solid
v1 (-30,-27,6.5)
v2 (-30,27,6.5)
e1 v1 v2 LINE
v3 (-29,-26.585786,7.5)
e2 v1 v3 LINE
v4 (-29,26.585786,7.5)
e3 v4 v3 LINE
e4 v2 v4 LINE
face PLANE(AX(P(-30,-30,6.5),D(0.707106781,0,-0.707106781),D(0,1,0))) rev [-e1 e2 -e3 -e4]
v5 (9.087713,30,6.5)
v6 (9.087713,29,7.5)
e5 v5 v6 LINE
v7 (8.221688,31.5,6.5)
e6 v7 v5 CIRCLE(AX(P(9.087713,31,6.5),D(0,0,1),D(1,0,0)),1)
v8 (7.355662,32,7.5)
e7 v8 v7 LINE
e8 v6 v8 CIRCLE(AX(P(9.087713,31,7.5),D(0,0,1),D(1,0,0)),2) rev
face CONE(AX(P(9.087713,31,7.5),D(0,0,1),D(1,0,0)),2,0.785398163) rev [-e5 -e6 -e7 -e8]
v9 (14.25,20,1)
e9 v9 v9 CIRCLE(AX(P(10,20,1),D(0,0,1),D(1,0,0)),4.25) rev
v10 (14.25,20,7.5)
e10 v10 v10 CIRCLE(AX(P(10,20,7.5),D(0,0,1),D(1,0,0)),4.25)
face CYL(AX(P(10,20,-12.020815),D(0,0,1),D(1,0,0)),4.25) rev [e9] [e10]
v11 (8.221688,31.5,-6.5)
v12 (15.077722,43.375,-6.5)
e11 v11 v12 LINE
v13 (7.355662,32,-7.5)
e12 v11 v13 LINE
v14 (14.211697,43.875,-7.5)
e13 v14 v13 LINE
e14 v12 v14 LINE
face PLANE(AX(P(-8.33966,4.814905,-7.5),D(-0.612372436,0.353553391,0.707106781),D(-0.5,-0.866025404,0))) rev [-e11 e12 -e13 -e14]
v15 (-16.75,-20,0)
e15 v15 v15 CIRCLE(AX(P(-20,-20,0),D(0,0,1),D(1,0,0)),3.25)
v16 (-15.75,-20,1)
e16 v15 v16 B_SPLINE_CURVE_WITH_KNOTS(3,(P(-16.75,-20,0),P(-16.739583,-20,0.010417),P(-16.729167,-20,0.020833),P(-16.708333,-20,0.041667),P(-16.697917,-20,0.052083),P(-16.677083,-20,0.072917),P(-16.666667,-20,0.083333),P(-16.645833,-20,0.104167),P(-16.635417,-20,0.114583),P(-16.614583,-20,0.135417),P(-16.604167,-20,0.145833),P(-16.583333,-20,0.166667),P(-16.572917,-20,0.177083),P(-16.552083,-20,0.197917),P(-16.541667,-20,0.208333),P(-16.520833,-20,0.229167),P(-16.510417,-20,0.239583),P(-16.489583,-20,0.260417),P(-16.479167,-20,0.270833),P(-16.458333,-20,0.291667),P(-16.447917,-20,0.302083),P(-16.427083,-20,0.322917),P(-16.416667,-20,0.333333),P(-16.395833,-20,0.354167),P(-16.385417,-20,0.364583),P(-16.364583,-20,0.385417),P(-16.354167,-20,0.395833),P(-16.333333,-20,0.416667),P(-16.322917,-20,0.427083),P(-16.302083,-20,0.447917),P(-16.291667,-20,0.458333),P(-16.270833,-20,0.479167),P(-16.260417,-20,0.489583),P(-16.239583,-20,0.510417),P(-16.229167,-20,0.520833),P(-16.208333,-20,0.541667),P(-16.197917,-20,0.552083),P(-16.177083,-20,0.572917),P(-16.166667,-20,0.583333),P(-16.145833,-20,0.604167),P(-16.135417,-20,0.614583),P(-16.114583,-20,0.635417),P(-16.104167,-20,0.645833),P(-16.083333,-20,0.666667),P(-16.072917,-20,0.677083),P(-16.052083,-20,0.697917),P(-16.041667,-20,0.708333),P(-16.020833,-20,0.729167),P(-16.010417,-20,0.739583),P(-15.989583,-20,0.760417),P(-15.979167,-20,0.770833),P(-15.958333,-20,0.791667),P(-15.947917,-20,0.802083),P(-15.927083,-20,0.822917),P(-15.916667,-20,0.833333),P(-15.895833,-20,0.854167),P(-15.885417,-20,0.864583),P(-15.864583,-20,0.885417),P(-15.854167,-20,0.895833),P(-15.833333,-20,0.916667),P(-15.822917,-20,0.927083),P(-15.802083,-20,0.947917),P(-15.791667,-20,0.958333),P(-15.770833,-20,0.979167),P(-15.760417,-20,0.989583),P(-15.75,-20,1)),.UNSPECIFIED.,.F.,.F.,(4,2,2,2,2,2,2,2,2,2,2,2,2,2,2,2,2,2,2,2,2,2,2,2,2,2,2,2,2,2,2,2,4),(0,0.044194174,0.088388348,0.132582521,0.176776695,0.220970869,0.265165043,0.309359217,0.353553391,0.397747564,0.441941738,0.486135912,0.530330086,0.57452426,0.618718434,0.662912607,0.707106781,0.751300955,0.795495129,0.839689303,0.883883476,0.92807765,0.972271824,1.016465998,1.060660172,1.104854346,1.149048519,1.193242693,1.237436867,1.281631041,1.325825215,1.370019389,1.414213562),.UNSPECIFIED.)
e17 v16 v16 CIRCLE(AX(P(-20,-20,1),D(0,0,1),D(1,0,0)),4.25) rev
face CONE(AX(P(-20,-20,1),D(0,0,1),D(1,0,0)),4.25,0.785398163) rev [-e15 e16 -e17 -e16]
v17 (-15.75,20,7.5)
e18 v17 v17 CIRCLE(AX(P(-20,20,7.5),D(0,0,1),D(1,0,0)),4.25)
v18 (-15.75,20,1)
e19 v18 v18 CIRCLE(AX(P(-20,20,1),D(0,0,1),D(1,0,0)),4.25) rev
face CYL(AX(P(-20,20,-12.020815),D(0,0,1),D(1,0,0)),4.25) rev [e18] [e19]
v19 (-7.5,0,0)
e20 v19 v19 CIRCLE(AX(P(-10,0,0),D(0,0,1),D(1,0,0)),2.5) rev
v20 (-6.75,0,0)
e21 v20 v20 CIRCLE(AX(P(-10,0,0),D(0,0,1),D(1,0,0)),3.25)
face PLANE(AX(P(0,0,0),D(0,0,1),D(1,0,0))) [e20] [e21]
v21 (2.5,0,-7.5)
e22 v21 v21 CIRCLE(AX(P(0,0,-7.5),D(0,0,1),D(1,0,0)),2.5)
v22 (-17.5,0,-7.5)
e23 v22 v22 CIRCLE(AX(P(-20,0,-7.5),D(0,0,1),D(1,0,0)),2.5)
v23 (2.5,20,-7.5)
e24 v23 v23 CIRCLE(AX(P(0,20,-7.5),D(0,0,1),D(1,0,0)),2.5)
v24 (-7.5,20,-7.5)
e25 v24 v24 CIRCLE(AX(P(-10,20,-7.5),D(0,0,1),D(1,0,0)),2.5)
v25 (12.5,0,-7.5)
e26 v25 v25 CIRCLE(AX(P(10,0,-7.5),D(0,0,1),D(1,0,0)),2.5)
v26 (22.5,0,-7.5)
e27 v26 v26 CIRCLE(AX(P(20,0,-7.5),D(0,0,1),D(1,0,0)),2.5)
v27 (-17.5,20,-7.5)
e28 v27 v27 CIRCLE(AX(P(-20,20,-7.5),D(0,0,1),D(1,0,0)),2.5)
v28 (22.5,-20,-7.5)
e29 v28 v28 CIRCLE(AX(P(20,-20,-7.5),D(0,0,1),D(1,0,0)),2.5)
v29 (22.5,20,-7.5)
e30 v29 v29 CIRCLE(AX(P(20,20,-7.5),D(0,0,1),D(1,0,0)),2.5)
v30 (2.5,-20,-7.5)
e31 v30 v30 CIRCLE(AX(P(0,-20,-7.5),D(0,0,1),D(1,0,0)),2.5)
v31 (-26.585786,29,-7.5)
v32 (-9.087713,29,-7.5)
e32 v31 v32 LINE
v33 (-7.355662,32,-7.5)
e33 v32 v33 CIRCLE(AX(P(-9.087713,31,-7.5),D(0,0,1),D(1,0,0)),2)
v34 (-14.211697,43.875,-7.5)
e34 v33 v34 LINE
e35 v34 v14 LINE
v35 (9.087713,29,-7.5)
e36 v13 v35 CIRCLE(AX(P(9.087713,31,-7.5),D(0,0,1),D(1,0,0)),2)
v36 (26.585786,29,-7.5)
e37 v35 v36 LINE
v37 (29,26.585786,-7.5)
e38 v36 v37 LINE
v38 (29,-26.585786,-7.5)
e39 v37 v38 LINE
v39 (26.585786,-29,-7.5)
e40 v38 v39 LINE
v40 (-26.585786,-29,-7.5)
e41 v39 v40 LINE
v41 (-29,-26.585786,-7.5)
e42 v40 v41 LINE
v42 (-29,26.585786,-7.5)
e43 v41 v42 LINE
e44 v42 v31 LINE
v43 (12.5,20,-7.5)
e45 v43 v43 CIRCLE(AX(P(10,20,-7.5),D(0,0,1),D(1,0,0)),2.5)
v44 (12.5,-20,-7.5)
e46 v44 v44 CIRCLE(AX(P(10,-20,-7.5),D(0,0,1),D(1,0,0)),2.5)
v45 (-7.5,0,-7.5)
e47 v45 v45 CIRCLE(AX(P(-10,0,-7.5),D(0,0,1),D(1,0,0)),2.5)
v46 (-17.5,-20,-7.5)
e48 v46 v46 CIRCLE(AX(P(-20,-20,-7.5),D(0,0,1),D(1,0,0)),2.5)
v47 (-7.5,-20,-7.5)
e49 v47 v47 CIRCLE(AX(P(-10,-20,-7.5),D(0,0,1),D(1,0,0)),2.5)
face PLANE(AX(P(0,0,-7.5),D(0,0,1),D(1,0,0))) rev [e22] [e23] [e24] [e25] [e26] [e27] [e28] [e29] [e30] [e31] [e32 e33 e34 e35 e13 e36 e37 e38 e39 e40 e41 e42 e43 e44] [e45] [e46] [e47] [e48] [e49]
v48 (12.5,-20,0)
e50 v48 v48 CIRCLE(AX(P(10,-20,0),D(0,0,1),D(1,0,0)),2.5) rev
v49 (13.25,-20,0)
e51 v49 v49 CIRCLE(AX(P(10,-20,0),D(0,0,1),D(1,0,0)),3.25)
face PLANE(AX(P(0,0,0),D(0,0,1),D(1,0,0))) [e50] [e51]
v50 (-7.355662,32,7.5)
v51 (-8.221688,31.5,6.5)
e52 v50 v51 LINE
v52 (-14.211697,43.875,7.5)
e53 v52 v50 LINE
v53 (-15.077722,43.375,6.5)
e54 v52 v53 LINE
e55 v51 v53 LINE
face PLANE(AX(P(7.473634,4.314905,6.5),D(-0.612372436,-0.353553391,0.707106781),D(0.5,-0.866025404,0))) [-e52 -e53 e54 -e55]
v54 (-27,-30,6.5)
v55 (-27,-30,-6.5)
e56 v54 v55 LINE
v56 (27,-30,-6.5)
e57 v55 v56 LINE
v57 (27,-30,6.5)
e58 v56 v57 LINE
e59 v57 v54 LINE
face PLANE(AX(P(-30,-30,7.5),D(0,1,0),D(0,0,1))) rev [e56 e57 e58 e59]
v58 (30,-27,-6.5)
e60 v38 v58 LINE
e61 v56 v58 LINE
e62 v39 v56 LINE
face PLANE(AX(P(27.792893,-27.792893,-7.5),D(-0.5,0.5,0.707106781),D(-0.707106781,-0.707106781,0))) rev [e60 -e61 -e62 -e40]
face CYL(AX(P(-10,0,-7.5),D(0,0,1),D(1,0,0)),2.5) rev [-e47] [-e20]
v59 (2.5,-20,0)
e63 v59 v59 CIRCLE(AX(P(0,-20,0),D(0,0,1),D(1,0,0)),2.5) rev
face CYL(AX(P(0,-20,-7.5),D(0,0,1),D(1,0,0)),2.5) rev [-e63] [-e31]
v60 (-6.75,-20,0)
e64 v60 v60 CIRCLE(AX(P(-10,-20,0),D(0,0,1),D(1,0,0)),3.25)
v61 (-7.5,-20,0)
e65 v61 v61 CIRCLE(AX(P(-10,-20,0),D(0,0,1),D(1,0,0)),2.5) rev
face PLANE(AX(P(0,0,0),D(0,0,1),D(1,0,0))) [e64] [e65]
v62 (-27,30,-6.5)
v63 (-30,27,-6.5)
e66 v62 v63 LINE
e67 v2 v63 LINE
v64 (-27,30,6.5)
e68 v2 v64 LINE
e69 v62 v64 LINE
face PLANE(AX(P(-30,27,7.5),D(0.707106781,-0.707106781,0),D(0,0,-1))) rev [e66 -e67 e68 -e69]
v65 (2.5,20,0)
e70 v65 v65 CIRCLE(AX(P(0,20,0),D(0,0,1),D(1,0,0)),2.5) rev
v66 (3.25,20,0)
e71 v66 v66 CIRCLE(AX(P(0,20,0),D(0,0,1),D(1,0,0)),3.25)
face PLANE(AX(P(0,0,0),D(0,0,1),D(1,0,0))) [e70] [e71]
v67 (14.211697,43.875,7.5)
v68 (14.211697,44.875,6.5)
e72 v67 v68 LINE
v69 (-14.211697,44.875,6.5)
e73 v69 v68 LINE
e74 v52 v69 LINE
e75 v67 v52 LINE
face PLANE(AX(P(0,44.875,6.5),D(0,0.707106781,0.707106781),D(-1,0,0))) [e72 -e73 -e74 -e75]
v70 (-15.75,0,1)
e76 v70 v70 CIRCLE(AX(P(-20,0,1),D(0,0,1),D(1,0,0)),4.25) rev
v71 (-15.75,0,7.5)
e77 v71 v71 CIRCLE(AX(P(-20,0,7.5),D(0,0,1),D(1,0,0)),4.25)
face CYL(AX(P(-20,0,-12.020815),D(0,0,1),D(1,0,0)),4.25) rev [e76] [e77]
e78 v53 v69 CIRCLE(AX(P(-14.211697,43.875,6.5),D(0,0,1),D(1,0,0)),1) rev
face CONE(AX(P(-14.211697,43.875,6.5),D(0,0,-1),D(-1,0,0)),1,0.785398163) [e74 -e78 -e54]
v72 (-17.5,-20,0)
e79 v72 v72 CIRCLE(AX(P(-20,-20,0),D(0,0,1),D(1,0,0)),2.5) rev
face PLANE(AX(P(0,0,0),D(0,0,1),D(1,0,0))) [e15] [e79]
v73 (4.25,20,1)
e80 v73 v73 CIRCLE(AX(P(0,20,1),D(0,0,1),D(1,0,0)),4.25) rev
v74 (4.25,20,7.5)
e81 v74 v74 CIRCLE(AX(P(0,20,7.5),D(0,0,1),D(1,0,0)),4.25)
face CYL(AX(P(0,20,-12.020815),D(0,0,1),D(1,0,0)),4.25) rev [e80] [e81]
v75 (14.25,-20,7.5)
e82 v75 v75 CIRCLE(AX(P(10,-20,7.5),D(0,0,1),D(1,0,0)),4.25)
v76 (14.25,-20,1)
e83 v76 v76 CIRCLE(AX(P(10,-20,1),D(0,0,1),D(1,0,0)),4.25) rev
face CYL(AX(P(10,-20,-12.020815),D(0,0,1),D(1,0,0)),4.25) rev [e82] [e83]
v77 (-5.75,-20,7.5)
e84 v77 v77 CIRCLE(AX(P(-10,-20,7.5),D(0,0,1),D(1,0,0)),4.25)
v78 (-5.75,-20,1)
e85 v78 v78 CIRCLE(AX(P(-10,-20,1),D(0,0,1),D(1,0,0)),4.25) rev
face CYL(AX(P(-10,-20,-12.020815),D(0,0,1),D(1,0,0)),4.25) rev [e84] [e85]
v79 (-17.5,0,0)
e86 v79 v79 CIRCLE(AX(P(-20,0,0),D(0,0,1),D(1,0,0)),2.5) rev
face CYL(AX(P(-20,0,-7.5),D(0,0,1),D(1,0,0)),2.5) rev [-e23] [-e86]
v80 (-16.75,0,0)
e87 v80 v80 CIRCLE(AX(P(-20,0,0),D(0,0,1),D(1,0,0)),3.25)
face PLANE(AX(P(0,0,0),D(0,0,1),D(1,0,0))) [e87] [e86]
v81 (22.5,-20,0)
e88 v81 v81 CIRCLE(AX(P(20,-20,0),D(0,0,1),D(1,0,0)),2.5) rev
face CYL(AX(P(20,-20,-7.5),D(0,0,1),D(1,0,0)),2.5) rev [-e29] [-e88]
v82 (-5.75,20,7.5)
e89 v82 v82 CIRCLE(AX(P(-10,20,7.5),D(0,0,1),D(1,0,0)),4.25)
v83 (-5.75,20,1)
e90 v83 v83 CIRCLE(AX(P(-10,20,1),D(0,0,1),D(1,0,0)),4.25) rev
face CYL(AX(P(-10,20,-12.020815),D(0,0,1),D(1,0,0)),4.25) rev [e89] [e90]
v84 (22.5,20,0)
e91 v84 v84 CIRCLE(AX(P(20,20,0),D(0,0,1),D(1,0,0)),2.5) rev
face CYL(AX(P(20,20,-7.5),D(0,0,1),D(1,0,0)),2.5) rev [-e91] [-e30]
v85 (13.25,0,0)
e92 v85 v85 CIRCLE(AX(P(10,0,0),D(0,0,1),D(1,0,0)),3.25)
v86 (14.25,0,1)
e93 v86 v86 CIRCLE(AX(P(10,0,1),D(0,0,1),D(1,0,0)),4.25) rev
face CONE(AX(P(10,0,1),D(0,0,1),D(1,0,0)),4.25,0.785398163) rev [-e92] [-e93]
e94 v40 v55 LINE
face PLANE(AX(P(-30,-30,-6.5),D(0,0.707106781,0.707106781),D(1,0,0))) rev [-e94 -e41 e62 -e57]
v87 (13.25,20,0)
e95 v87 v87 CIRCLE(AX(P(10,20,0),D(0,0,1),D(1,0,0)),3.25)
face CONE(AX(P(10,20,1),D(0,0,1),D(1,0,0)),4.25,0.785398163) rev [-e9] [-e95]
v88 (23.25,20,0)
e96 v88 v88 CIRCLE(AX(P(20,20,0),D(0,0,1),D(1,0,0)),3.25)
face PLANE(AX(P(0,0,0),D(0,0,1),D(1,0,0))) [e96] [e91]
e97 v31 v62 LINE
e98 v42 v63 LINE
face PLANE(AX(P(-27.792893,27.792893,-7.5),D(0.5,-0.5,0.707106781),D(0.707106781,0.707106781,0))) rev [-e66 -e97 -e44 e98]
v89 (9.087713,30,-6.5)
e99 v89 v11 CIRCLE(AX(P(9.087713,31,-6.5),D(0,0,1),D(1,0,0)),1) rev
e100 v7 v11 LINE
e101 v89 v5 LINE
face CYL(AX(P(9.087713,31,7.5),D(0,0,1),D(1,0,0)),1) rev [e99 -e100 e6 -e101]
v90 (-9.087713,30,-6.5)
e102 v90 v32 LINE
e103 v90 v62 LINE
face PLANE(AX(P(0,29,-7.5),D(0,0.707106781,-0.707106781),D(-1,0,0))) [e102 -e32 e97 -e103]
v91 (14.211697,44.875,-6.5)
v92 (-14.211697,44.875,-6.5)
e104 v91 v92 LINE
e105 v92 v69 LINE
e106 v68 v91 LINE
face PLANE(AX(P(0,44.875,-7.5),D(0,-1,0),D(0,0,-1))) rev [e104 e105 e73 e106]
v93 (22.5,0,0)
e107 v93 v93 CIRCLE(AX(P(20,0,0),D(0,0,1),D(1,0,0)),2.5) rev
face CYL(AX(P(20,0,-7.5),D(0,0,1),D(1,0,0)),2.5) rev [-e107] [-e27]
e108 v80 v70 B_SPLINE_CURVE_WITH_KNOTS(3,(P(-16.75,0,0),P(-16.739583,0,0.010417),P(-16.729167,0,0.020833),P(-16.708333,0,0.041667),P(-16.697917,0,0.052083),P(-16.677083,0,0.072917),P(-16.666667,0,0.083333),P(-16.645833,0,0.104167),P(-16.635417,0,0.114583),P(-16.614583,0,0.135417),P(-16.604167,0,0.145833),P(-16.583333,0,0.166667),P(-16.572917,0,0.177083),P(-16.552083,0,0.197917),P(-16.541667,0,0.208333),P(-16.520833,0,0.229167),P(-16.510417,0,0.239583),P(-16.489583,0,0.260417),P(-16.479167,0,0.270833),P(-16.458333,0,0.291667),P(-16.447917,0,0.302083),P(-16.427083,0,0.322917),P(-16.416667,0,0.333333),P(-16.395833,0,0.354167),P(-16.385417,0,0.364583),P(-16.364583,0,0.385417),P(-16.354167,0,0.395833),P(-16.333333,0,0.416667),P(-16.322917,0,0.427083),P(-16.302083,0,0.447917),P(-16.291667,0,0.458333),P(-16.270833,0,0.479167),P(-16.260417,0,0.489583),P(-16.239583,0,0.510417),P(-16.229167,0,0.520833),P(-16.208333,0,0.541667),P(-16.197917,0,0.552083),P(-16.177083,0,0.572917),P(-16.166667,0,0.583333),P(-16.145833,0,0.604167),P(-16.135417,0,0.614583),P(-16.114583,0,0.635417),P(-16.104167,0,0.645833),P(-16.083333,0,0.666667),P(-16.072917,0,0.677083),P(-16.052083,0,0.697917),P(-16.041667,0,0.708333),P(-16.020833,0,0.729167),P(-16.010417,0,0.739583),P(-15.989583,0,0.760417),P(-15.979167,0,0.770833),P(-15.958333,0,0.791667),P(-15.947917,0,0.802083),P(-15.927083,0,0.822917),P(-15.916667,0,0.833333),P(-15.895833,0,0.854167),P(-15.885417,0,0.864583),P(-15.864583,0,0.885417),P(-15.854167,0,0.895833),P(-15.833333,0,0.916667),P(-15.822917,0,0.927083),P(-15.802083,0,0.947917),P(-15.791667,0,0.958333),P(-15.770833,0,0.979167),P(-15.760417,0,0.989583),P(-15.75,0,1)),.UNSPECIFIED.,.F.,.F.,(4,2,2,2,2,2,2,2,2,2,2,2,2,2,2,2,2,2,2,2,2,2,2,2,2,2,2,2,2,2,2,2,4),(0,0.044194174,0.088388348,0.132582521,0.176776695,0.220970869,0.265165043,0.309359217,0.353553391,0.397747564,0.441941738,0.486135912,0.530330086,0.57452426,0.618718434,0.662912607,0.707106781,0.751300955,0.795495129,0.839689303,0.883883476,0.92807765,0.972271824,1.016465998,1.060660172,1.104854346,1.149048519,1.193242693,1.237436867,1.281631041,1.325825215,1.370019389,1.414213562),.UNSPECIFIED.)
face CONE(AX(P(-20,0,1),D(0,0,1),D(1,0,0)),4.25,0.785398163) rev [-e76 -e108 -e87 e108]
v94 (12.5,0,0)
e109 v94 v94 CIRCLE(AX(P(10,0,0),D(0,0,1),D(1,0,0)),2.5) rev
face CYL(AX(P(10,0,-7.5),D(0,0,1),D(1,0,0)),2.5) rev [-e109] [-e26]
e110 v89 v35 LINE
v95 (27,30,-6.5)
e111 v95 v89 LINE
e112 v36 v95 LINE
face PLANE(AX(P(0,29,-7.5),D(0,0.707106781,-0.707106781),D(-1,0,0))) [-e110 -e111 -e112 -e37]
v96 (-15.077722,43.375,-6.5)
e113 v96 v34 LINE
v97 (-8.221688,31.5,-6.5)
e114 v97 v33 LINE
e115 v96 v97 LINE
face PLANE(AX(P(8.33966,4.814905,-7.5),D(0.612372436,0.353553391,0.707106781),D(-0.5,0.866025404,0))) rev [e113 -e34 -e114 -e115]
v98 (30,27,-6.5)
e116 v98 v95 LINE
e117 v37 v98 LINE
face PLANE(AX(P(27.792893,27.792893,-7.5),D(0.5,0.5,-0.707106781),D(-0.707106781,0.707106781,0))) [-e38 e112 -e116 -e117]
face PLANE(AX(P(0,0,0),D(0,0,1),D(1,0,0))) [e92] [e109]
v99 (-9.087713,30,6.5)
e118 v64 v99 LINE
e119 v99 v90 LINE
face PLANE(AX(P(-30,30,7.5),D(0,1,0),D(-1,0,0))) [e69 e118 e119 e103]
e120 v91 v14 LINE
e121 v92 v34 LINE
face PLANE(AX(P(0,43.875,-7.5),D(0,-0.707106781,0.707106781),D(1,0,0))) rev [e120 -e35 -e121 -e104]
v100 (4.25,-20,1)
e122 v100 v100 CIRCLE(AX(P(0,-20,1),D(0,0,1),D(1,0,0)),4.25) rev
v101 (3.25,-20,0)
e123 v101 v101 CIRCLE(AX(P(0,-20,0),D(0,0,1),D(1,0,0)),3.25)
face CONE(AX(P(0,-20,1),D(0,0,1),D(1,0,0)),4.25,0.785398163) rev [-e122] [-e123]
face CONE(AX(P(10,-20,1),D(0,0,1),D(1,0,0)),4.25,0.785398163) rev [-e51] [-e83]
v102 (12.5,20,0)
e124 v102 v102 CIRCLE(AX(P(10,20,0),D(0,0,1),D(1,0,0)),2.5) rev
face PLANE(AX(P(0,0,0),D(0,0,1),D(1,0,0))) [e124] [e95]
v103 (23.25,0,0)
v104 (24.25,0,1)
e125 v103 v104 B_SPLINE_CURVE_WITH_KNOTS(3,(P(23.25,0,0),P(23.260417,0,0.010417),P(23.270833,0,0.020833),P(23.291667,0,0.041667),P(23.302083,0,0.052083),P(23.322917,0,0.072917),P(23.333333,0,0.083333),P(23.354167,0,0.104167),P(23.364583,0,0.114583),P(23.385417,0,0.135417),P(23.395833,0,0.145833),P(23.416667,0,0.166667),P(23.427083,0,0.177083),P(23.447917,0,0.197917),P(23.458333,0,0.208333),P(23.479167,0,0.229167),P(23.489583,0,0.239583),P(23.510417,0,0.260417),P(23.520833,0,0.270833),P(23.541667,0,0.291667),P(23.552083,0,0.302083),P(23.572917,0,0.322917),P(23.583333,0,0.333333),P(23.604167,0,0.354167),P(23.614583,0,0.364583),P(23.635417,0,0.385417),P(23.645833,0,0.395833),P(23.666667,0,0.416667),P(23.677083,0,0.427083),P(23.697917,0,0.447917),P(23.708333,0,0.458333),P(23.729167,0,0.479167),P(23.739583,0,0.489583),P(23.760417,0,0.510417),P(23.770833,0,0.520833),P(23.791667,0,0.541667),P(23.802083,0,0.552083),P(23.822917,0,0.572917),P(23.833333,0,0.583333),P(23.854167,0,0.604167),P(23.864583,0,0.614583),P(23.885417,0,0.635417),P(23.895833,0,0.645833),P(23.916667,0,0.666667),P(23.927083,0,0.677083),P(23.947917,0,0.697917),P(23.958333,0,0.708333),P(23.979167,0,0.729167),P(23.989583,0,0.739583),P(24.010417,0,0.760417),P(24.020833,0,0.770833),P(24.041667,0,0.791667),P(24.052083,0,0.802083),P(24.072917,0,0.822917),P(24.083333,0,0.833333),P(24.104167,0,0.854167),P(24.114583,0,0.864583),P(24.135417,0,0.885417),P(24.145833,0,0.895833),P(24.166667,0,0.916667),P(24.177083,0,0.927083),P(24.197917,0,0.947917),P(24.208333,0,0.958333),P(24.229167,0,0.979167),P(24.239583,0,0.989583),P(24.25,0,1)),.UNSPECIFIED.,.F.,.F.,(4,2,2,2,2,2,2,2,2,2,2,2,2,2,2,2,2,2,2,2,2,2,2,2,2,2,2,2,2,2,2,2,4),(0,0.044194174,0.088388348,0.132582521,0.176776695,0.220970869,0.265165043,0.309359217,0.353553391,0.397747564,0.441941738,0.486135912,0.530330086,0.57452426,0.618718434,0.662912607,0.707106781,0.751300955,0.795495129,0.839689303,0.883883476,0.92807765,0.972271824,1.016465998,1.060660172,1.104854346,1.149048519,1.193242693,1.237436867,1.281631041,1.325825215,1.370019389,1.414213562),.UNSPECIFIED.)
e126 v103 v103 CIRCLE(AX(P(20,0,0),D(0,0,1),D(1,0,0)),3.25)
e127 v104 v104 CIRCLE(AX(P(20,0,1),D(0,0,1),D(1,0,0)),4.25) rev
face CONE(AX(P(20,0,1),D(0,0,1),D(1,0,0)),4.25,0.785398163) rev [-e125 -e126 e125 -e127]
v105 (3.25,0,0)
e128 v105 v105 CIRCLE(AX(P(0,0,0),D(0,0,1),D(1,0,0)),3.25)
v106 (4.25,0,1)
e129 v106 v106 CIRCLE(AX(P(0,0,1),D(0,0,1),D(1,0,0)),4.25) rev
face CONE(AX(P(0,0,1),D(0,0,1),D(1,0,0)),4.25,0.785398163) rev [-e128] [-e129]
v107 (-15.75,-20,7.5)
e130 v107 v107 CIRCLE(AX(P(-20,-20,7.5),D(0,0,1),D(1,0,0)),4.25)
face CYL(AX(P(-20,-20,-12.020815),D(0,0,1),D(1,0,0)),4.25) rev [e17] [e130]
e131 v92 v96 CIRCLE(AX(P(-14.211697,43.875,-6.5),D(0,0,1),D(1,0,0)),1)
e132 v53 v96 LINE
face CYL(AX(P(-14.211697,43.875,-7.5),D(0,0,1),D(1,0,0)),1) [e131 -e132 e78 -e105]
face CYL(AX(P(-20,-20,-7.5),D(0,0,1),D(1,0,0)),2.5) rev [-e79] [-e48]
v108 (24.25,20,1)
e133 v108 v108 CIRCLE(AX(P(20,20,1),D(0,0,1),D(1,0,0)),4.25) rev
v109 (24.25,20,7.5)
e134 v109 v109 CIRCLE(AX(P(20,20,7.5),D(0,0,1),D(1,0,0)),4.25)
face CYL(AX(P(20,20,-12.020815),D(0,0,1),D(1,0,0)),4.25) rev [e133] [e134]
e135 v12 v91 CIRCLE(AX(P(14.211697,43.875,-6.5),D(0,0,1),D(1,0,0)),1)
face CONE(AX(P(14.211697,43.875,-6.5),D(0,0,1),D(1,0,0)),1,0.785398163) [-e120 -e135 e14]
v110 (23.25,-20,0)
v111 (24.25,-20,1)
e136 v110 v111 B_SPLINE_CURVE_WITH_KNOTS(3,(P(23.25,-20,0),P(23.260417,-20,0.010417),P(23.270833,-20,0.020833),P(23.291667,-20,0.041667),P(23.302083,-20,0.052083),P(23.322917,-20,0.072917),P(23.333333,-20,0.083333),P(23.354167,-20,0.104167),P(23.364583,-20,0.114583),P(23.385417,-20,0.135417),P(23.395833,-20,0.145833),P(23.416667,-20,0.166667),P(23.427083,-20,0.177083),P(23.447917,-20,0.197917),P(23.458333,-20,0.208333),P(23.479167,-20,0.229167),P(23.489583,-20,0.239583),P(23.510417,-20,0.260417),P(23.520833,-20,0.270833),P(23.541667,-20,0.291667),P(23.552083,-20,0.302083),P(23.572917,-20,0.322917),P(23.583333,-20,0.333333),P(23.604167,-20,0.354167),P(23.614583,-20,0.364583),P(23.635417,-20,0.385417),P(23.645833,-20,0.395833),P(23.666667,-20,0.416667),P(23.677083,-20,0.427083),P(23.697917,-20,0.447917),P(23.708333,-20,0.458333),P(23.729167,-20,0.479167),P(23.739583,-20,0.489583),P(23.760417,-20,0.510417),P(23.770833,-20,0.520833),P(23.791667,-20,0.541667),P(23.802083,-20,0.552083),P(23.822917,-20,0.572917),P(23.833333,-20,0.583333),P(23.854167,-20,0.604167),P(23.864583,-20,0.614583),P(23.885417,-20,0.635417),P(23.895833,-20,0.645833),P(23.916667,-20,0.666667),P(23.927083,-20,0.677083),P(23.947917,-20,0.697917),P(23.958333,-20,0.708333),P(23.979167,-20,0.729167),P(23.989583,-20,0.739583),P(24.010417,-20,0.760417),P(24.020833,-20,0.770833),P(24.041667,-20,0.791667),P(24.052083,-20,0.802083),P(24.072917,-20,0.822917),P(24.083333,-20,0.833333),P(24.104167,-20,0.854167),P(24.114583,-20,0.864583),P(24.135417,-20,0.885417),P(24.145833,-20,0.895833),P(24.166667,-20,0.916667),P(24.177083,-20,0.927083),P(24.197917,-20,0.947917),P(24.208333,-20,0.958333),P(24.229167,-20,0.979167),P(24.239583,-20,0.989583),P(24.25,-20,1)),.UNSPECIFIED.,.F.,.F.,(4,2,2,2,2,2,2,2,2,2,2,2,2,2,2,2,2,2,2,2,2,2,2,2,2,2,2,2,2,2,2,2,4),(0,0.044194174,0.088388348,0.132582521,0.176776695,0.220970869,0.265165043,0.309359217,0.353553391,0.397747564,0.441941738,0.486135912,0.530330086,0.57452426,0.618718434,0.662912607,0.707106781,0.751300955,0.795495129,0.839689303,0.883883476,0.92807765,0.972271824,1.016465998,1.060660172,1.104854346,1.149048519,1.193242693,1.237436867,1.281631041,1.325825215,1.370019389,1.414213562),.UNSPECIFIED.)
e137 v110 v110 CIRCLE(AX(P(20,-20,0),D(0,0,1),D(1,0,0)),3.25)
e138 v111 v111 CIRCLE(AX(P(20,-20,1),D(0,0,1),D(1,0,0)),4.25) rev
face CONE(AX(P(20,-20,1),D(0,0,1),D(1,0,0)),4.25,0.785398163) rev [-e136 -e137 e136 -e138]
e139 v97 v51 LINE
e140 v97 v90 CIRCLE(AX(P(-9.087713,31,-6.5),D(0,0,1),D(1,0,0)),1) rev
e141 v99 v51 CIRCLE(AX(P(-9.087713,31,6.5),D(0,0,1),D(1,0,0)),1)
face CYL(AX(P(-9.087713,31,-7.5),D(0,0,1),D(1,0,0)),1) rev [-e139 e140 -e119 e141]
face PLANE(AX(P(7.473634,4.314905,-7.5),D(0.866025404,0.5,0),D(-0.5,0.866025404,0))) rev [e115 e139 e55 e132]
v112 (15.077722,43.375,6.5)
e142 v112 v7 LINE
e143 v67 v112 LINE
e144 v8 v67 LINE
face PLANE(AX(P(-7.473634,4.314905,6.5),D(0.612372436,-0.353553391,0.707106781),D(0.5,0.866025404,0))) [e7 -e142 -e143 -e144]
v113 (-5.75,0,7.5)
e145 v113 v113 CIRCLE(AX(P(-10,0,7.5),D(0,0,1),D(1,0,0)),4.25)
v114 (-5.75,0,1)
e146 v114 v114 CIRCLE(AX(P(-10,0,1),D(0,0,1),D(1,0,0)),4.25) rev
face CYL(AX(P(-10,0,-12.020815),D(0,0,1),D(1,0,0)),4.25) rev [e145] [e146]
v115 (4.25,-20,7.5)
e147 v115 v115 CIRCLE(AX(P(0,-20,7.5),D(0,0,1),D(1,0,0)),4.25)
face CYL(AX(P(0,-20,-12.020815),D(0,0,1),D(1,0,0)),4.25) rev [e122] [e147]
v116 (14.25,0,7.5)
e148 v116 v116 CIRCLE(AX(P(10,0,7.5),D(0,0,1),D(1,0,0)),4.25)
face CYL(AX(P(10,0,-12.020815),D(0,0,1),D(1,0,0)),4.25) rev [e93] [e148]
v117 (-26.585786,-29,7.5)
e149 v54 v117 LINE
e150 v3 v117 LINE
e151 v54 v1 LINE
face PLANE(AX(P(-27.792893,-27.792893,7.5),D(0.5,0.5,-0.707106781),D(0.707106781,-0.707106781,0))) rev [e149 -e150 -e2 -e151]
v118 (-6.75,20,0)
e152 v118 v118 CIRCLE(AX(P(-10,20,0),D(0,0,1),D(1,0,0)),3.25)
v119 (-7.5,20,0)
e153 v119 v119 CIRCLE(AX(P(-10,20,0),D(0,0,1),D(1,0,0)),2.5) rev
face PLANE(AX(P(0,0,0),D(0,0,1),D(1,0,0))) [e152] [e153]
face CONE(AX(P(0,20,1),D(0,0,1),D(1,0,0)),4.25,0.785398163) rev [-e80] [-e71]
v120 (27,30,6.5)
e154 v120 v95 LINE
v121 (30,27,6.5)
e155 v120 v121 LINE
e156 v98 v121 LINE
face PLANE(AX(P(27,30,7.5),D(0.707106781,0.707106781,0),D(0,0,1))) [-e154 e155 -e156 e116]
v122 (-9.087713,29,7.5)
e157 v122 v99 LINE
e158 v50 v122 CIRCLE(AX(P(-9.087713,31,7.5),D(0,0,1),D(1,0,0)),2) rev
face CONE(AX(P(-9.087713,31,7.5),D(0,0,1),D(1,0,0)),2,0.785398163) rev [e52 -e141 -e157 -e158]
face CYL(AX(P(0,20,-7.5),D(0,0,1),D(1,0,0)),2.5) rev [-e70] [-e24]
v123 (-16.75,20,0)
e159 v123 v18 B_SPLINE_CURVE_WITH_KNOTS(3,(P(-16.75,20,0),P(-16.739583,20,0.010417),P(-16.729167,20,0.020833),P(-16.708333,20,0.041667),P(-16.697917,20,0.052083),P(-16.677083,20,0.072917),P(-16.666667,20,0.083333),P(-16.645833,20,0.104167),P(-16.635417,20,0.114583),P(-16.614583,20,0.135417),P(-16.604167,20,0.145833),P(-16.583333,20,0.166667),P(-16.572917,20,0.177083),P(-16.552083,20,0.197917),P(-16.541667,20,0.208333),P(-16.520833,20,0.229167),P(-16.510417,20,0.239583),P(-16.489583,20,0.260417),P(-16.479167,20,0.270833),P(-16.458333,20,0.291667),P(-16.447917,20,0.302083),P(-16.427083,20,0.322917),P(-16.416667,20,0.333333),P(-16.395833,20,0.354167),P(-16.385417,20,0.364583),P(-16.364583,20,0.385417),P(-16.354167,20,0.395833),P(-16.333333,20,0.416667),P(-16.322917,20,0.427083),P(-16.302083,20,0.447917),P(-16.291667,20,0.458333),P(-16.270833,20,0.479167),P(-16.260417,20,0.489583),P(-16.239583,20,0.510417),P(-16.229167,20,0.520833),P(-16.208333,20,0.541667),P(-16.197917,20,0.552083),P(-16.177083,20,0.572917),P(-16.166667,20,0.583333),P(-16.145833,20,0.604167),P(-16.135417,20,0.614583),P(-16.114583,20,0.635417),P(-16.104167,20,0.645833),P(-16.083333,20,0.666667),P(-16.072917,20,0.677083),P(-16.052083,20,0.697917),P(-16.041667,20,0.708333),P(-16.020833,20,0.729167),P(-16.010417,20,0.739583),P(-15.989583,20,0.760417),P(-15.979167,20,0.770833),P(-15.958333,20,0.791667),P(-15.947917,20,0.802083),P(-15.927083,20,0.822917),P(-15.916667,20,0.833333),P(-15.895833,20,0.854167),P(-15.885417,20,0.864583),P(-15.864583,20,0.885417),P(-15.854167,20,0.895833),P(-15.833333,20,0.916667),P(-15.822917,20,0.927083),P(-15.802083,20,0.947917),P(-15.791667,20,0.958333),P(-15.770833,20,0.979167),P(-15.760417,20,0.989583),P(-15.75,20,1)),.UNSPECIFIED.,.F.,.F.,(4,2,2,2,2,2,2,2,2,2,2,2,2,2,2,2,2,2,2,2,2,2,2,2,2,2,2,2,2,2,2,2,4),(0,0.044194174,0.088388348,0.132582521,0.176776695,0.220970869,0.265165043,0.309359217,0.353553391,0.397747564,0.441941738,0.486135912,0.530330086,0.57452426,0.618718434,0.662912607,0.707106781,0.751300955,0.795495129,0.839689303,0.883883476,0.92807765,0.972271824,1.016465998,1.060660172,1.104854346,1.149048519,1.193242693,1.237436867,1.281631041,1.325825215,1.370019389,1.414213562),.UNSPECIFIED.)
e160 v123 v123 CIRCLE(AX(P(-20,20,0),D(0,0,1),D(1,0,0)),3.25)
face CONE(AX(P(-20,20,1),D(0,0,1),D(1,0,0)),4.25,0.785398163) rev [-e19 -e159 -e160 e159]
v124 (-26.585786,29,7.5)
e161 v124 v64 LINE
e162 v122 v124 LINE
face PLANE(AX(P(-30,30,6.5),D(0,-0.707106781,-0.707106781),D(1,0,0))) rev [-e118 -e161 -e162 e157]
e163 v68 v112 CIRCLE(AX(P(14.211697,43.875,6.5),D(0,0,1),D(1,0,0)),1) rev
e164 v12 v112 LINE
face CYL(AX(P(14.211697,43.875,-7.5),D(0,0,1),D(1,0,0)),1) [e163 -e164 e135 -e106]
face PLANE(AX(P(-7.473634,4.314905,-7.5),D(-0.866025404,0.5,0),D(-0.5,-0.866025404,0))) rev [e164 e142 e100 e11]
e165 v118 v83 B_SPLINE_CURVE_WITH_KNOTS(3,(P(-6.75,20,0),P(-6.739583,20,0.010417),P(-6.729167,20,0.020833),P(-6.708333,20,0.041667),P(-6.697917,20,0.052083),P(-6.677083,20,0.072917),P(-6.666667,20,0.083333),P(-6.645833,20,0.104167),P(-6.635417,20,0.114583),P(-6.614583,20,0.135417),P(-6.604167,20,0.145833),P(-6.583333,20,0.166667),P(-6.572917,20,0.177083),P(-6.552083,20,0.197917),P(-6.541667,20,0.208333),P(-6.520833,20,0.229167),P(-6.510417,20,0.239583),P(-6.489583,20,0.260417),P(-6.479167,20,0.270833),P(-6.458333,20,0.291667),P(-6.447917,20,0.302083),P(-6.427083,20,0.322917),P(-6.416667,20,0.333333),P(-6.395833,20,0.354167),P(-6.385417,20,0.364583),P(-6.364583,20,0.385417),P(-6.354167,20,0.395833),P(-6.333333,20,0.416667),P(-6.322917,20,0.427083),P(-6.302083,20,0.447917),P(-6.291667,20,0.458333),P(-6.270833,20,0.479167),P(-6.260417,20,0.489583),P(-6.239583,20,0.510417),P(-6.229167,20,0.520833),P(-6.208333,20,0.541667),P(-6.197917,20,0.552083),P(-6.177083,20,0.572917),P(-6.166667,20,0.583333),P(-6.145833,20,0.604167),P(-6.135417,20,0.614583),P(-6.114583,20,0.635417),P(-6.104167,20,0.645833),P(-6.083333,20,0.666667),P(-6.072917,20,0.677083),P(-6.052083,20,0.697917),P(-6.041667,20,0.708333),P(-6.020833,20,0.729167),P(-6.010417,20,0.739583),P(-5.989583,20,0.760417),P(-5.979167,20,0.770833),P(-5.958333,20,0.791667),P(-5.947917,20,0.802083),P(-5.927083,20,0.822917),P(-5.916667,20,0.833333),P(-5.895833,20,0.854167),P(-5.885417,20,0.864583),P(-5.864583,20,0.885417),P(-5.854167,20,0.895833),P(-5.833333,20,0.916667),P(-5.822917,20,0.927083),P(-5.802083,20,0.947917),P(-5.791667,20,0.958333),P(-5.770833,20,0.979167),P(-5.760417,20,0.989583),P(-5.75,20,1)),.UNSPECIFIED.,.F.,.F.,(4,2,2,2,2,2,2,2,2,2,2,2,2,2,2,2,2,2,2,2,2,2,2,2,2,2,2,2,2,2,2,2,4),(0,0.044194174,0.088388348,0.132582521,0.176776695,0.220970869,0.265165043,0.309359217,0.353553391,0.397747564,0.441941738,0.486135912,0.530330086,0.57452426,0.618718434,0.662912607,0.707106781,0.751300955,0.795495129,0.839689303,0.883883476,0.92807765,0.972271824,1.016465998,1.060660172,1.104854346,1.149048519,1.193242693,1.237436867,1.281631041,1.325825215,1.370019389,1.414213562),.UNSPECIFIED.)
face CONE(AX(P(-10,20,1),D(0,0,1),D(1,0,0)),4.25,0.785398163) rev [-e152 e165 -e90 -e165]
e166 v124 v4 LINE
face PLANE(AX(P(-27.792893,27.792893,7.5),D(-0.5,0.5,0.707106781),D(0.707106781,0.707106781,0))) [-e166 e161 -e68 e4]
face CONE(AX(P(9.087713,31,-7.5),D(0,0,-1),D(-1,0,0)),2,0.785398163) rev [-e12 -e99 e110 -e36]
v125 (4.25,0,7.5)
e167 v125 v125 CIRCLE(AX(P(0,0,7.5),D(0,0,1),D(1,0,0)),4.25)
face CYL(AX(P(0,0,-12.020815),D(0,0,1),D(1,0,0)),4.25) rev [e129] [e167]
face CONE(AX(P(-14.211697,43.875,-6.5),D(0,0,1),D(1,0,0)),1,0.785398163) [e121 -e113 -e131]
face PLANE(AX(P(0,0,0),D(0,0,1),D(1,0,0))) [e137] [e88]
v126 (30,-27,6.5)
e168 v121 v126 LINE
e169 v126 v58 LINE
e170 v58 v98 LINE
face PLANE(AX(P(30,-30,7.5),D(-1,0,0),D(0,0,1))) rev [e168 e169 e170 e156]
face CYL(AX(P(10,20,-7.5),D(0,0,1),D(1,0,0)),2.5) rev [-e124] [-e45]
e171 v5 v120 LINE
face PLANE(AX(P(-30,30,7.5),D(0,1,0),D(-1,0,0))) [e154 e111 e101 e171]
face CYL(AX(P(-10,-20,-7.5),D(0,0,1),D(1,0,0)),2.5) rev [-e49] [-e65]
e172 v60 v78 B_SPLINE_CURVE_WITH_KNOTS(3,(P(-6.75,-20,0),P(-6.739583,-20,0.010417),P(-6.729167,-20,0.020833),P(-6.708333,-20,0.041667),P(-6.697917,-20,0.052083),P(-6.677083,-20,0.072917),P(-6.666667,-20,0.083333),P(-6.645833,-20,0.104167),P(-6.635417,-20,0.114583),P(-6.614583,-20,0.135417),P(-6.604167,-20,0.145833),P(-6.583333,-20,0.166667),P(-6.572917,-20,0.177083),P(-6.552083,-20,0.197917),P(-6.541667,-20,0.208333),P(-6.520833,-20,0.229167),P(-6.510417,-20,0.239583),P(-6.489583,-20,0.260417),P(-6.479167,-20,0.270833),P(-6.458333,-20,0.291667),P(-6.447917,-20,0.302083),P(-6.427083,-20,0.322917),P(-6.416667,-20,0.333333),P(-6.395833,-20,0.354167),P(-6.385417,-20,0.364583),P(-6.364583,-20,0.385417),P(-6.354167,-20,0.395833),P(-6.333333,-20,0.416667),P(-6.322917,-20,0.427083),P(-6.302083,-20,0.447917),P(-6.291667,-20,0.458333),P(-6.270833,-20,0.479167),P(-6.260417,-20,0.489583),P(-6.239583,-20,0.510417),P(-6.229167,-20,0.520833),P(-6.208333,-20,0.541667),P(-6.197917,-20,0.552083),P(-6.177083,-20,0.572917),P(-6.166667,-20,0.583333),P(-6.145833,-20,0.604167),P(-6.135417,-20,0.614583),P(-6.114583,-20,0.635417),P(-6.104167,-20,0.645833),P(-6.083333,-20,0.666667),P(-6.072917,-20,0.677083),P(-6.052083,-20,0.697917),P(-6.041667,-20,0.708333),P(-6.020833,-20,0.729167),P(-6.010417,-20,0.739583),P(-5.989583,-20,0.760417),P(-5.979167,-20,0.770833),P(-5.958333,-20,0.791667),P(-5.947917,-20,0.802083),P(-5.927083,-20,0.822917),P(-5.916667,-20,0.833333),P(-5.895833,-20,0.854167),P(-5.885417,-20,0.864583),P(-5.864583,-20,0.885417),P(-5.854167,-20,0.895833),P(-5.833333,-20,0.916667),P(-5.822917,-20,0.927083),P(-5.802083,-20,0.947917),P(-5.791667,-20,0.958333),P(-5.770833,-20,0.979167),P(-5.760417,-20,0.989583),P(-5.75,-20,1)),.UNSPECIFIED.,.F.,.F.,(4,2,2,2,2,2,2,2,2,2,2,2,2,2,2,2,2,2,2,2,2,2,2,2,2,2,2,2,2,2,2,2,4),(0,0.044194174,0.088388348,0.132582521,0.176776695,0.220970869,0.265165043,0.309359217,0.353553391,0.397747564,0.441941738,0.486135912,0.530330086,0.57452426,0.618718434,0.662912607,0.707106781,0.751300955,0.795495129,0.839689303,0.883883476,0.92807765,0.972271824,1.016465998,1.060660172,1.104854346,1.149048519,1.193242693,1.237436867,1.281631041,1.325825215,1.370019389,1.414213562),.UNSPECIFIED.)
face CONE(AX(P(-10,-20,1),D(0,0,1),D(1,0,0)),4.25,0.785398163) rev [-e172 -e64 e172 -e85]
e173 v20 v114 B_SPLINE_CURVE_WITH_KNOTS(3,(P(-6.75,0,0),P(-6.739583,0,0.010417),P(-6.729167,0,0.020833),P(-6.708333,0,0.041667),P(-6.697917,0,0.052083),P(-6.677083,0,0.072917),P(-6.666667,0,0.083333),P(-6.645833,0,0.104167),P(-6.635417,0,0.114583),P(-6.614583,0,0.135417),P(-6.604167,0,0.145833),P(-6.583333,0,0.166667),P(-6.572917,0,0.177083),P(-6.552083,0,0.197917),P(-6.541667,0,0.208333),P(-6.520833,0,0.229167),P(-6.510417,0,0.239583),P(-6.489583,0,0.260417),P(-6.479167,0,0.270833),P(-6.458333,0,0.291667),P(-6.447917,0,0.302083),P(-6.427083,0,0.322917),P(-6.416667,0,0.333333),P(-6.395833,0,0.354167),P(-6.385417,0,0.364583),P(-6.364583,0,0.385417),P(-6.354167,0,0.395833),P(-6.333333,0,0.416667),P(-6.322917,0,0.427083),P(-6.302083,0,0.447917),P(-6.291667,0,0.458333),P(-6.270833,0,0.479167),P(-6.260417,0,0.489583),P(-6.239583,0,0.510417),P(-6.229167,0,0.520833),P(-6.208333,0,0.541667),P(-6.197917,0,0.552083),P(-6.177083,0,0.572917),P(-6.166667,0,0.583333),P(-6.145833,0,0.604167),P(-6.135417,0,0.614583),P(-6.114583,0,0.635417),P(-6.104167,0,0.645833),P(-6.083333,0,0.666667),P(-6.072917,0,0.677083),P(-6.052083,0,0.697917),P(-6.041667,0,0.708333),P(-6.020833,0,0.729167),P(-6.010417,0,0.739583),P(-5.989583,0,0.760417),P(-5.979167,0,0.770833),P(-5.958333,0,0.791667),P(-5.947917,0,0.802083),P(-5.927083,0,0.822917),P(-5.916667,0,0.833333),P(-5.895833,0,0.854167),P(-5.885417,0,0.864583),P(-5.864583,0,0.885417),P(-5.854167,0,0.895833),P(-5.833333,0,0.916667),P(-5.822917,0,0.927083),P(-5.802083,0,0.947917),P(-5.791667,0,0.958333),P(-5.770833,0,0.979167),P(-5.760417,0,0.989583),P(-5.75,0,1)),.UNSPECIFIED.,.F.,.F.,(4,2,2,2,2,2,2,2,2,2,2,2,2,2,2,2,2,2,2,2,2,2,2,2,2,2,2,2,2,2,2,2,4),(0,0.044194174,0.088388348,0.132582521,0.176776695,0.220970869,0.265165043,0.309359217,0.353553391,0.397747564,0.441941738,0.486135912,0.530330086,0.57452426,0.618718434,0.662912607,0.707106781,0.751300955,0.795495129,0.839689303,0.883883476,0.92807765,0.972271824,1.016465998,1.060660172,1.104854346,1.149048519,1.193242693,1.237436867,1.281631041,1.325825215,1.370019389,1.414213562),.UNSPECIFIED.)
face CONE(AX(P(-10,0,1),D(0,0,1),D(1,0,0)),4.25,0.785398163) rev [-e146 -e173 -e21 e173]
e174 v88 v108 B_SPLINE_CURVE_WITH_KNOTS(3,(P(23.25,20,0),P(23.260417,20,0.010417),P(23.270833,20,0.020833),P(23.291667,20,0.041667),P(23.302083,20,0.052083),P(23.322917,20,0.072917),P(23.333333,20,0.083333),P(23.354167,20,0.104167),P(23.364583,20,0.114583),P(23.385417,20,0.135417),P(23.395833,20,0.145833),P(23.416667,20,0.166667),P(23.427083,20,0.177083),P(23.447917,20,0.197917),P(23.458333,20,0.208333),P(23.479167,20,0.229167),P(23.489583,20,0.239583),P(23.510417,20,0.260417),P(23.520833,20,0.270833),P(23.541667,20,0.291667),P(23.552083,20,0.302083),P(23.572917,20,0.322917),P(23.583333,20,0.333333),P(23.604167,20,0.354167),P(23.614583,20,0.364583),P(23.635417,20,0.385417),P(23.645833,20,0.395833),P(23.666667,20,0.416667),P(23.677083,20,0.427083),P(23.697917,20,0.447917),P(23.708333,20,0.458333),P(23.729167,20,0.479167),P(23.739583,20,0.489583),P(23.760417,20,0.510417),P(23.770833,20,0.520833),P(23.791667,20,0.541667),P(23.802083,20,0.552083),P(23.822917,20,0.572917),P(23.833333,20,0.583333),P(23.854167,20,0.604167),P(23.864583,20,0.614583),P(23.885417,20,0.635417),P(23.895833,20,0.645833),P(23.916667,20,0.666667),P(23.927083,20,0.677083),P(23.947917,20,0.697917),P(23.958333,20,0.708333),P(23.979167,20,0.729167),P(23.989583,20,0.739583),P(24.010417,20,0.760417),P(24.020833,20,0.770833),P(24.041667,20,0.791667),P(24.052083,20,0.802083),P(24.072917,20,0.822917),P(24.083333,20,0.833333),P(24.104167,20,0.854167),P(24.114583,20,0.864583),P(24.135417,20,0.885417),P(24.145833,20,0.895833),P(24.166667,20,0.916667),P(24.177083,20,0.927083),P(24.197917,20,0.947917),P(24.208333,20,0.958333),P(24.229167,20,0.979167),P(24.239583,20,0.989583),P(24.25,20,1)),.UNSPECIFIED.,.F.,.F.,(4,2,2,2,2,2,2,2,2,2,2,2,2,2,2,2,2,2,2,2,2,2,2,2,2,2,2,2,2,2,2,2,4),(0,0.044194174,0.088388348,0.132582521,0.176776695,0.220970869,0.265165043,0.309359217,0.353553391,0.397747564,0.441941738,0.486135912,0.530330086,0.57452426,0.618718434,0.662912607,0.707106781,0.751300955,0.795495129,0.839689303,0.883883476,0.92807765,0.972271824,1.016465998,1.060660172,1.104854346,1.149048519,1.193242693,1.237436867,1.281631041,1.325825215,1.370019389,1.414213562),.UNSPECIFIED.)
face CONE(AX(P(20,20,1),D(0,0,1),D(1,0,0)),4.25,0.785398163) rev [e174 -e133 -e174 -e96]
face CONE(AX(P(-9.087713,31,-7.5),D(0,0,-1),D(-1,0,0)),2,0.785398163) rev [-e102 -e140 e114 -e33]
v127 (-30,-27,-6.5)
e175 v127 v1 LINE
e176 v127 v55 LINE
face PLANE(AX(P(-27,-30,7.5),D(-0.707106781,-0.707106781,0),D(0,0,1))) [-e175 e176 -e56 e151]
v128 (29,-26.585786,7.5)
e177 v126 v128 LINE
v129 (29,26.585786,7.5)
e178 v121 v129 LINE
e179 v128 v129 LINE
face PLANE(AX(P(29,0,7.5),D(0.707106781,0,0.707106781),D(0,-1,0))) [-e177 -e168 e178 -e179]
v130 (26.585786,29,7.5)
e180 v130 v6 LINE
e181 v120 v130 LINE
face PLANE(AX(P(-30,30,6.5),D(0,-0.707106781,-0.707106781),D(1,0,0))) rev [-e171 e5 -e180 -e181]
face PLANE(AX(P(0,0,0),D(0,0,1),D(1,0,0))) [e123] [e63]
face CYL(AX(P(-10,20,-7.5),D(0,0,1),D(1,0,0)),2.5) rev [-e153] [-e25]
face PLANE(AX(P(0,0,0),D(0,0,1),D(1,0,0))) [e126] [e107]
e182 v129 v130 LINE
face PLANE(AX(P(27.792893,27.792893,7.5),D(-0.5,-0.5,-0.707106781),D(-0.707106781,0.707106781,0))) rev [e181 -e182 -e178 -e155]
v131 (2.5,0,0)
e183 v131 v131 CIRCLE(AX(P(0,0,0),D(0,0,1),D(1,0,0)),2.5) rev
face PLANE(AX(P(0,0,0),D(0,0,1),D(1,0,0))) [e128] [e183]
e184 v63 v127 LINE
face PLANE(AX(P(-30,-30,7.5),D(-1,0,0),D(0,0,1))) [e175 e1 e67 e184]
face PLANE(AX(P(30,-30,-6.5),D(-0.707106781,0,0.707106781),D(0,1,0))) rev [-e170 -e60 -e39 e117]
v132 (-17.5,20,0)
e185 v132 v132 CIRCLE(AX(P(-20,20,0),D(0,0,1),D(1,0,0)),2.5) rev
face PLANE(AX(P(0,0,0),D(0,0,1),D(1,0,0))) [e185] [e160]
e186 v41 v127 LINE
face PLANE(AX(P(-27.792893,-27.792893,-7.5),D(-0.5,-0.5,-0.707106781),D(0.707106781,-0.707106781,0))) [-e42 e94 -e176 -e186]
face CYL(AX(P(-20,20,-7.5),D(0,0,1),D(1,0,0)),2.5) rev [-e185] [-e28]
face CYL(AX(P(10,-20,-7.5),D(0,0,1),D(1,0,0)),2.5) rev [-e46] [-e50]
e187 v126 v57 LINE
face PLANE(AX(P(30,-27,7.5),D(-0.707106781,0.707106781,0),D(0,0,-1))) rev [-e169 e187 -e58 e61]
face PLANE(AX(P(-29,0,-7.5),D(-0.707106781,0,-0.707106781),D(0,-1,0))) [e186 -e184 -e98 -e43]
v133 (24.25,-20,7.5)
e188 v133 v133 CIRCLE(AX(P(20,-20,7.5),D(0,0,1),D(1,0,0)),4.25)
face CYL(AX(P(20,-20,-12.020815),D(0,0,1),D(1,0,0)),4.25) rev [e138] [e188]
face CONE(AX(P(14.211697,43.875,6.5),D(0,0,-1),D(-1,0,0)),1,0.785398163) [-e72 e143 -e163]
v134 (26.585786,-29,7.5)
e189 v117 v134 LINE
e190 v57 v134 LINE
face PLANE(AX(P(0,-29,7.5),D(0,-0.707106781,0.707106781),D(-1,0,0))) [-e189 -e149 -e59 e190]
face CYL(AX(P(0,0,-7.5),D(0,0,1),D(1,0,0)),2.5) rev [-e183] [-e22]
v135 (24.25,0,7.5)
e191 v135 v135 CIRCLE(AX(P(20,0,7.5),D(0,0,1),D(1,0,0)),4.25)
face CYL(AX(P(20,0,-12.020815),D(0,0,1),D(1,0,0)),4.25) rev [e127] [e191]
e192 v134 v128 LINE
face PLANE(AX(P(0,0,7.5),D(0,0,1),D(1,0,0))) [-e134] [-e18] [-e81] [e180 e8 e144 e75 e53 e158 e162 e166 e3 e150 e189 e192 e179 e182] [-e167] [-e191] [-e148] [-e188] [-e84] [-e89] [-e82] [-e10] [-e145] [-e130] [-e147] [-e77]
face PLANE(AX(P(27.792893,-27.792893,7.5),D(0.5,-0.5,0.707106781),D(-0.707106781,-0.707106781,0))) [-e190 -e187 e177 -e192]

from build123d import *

# Parameters (mm, degrees)
SKETCH2_W                  = 60
SKETCH2_H                  = 60
BOSS_EXTRUDE1_DEPTH        = 7.5
BOSS_EXTRUDE2_DEPTH        = 15
FILLET1_R                  = 1
SKETCH4_R                  = 2.5
CUT_EXTRUDE1_DEPTH         = 57.024687639
CUT_EXTRUDE2_START         = -7.5
SKETCH5_R                  = 4.25
CUT_EXTRUDE2_DEPTH         = 7.5
CHAMFER3_SIZE              = 1
LPATTERN1_COUNT            = 5
LPATTERN1_PITCH            = 10
CHAMFER3_OF_LPATTERN1_SIZE = 1
CHAMFER1_SIZE              = 3
CHAMFER2_SIZE              = 1


# Read off the part's stored shape, not the designer's step: LPattern2
with BuildPart() as part:
    # Sketch2 → Boss-Extrude1 (new, symmetric)
    with BuildSketch(Plane(origin=(0, 0, 0), x_dir=(0, 1, 0), z_dir=(0, 0, 1))):
        Rectangle(SKETCH2_W, SKETCH2_H)
    extrude(amount=BOSS_EXTRUDE1_DEPTH, both=True)

    # Sketch3 → Boss-Extrude2 (add, through all)
    with BuildSketch(Plane.XY.offset(7.5)):
        Polygon((-15.943747687, 44.875), (-7.355662433, 30), (7.355662433, 30), (15.943747687, 44.875), align=None)
    extrude(amount=-BOSS_EXTRUDE2_DEPTH)

    # Fillet1
    fillet1_edges = [part.edges().sort_by_distance(p)[0] for p in [
        (-7.355662433, 30, 0),
        (-15.943747687, 44.875, 0),
        (15.943747687, 44.875, 0),
        (7.355662433, 30, 0),
    ]]
    fillet(fillet1_edges, radius=FILLET1_R)

    # Sketch4 → Cut-Extrude1 (cut, symmetric)
    with BuildSketch(Plane.XY.offset(7.5)):
        with Locations((20, -20)):
            Circle(SKETCH4_R)
    cut_extrude1 = extrude(amount=CUT_EXTRUDE1_DEPTH, both=True, mode=Mode.SUBTRACT)

    # Sketch5 → Cut-Extrude2 (cut)
    with BuildSketch(Plane.XY.offset(7.5).offset(CUT_EXTRUDE2_START)):
        with Locations((20, -20)):
            Circle(SKETCH5_R)
    cut_extrude2 = extrude(amount=CUT_EXTRUDE2_DEPTH, mode=Mode.SUBTRACT)

    # Chamfer3
    chamfer3_edges = [part.edges().sort_by_distance(p)[0] for p in [
        (15.75, -20, 0),
    ]]
    chamfer(chamfer3_edges, length=CHAMFER3_SIZE)

    # LPattern1: Cut-Extrude1, Cut-Extrude2 ×5
    with Locations(*[(-i * LPATTERN1_PITCH, 0, 0) for i in range(1, LPATTERN1_COUNT)]):
        add(cut_extrude1, mode=Mode.SUBTRACT)
        add(cut_extrude2, mode=Mode.SUBTRACT)

    # Chamfer3 of LPattern1
    chamfer3_of_lpattern1_edges = [part.edges().sort_by_distance(p)[0] for p in [
        (5.75, -20, 0),
        (-4.25, -20, 0),
        (-14.25, -20, 0),
        (-24.25, -20, 0),
    ]]
    chamfer(chamfer3_of_lpattern1_edges, length=CHAMFER3_OF_LPATTERN1_SIZE)

    # LPattern2 outline → LPattern2 (revolve, cut)
    with BuildSketch(Plane(origin=(-20, 20, 0), x_dir=(1, 0, 0), z_dir=(0, -1, 0))):
        Polygon((0, -7.5), (2.5, -7.5), (2.5, 0), (3.25, 0), (4.25, 1), (4.25, 7.5), (0, 7.5), align=None)
    revolve(axis=Axis((-20, 20, 0), (0, 0, 1)), mode=Mode.SUBTRACT)

    # LPattern2 2 outline → LPattern2 2 (revolve, cut)
    with BuildSketch(Plane(origin=(-10, 20, 0), x_dir=(1, 0, 0), z_dir=(0, -1, 0))):
        Polygon((0, -7.5), (2.5, -7.5), (2.5, 0), (3.25, 0), (4.25, 1), (4.25, 7.5), (0, 7.5), align=None)
    revolve(axis=Axis((-10, 20, 0), (0, 0, 1)), mode=Mode.SUBTRACT)

    # LPattern2 3 outline → LPattern2 3 (revolve, cut)
    with BuildSketch(Plane.XZ.offset(-20)):
        Polygon((0, -7.5), (2.5, -7.5), (2.5, 0), (3.25, 0), (4.25, 1), (4.25, 7.5), (0, 7.5), align=None)
    revolve(axis=Axis((0, 20, 0), (0, 0, 1)), mode=Mode.SUBTRACT)

    # LPattern2 4 outline → LPattern2 4 (revolve, cut)
    with BuildSketch(Plane(origin=(10, 20, 0), x_dir=(1, 0, 0), z_dir=(0, -1, 0))):
        Polygon((0, -7.5), (2.5, -7.5), (2.5, 0), (3.25, 0), (4.25, 1), (4.25, 7.5), (0, 7.5), align=None)
    revolve(axis=Axis((10, 20, 0), (0, 0, 1)), mode=Mode.SUBTRACT)

    # LPattern2 5 outline → LPattern2 5 (revolve, cut)
    with BuildSketch(Plane(origin=(20, 20, 0), x_dir=(1, 0, 0), z_dir=(0, -1, 0))):
        Polygon((0, -7.5), (2.5, -7.5), (2.5, 0), (3.25, 0), (4.25, 1), (4.25, 7.5), (0, 7.5), align=None)
    revolve(axis=Axis((20, 20, 0), (0, 0, 1)), mode=Mode.SUBTRACT)

    # LPattern2 6 outline → LPattern2 6 (revolve, cut)
    with BuildSketch(Plane(origin=(-20, 0, 0), x_dir=(1, 0, 0), z_dir=(0, -1, 0))):
        Polygon((0, -7.5), (2.5, -7.5), (2.5, 0), (3.25, 0), (4.25, 1), (4.25, 7.5), (0, 7.5), align=None)
    revolve(axis=Axis((-20, 0, 0), (0, 0, 1)), mode=Mode.SUBTRACT)

    # LPattern2 7 outline → LPattern2 7 (revolve, cut)
    with BuildSketch(Plane(origin=(-10, 0, 0), x_dir=(1, 0, 0), z_dir=(0, -1, 0))):
        Polygon((0, -7.5), (2.5, -7.5), (2.5, 0), (3.25, 0), (4.25, 1), (4.25, 7.5), (0, 7.5), align=None)
    revolve(axis=Axis((-10, 0, 0), (0, 0, 1)), mode=Mode.SUBTRACT)

    # LPattern2 8 outline → LPattern2 8 (revolve, cut)
    with BuildSketch(Plane.XZ):
        Polygon((0, -7.5), (2.5, -7.5), (2.5, 0), (3.25, 0), (4.25, 1), (4.25, 7.5), (0, 7.5), align=None)
    revolve(axis=Axis((0, 0, 0), (0, 0, 1)), mode=Mode.SUBTRACT)

    # LPattern2 9 outline → LPattern2 9 (revolve, cut)
    with BuildSketch(Plane(origin=(10, 0, 0), x_dir=(1, 0, 0), z_dir=(0, -1, 0))):
        Polygon((0, -7.5), (2.5, -7.5), (2.5, 0), (3.25, 0), (4.25, 1), (4.25, 7.5), (0, 7.5), align=None)
    revolve(axis=Axis((10, 0, 0), (0, 0, 1)), mode=Mode.SUBTRACT)

    # LPattern2 10 outline → LPattern2 10 (revolve, cut)
    with BuildSketch(Plane(origin=(20, 0, 0), x_dir=(1, 0, 0), z_dir=(0, -1, 0))):
        Polygon((0, -7.5), (2.5, -7.5), (2.5, 0), (3.25, 0), (4.25, 1), (4.25, 7.5), (0, 7.5), align=None)
    revolve(axis=Axis((20, 0, 0), (0, 0, 1)), mode=Mode.SUBTRACT)

    # Chamfer1
    chamfer1_edges = [part.edges().sort_by_distance(p)[0] for p in [
        (-30, -30, 0),
        (-30, 30, 0),
        (30, 30, 0),
        (30, -30, 0),
    ]]
    chamfer(chamfer1_edges, length=CHAMFER1_SIZE)

    # Chamfer2
    chamfer2_edges = [part.edges().sort_by_distance(p)[0] for p in [
        (11.64970506, 37.4375, 7.5),
        (-30, 0, -7.5),
        (-30, 0, 7.5),
        (11.64970506, 37.4375, -7.5),
        (30, 0, -7.5),
        (0, -30, -7.5),
        (-18.04385662, 30, -7.5),
        (28.5, 28.5, -7.5),
        (28.5, -28.5, -7.5),
        (-28.5, -28.5, -7.5),
        (-28.5, 28.5, -7.5),
        (-18.04385662, 30, 7.5),
        (0, -30, 7.5),
        (30, 0, 7.5),
        (28.5, 28.5, 7.5),
        (28.5, -28.5, 7.5),
        (-28.5, -28.5, 7.5),
        (-28.5, 28.5, 7.5),
        (18.04385662, 30, 7.5),
        (0, 44.875, 7.5),
        (-11.64970506, 37.4375, 7.5),
        (-15.077722283, 44.375, 7.5),
        (15.077722283, 44.375, 7.5),
        (0, 44.875, -7.5),
        (-11.64970506, 37.4375, -7.5),
        (18.04385662, 30, -7.5),
        (-15.077722283, 44.375, -7.5),
        (15.077722283, 44.375, -7.5),
        (-8.221687836, 30.5, 7.5),
        (-8.221687836, 30.5, -7.5),
        (8.221687836, 30.5, 7.5),
        (8.221687836, 30.5, -7.5),
    ]]
    chamfer(chamfer2_edges, length=CHAMFER2_SIZE - 0.0001)  # a hair under: the kernel refuses the full size


solid = part.part
